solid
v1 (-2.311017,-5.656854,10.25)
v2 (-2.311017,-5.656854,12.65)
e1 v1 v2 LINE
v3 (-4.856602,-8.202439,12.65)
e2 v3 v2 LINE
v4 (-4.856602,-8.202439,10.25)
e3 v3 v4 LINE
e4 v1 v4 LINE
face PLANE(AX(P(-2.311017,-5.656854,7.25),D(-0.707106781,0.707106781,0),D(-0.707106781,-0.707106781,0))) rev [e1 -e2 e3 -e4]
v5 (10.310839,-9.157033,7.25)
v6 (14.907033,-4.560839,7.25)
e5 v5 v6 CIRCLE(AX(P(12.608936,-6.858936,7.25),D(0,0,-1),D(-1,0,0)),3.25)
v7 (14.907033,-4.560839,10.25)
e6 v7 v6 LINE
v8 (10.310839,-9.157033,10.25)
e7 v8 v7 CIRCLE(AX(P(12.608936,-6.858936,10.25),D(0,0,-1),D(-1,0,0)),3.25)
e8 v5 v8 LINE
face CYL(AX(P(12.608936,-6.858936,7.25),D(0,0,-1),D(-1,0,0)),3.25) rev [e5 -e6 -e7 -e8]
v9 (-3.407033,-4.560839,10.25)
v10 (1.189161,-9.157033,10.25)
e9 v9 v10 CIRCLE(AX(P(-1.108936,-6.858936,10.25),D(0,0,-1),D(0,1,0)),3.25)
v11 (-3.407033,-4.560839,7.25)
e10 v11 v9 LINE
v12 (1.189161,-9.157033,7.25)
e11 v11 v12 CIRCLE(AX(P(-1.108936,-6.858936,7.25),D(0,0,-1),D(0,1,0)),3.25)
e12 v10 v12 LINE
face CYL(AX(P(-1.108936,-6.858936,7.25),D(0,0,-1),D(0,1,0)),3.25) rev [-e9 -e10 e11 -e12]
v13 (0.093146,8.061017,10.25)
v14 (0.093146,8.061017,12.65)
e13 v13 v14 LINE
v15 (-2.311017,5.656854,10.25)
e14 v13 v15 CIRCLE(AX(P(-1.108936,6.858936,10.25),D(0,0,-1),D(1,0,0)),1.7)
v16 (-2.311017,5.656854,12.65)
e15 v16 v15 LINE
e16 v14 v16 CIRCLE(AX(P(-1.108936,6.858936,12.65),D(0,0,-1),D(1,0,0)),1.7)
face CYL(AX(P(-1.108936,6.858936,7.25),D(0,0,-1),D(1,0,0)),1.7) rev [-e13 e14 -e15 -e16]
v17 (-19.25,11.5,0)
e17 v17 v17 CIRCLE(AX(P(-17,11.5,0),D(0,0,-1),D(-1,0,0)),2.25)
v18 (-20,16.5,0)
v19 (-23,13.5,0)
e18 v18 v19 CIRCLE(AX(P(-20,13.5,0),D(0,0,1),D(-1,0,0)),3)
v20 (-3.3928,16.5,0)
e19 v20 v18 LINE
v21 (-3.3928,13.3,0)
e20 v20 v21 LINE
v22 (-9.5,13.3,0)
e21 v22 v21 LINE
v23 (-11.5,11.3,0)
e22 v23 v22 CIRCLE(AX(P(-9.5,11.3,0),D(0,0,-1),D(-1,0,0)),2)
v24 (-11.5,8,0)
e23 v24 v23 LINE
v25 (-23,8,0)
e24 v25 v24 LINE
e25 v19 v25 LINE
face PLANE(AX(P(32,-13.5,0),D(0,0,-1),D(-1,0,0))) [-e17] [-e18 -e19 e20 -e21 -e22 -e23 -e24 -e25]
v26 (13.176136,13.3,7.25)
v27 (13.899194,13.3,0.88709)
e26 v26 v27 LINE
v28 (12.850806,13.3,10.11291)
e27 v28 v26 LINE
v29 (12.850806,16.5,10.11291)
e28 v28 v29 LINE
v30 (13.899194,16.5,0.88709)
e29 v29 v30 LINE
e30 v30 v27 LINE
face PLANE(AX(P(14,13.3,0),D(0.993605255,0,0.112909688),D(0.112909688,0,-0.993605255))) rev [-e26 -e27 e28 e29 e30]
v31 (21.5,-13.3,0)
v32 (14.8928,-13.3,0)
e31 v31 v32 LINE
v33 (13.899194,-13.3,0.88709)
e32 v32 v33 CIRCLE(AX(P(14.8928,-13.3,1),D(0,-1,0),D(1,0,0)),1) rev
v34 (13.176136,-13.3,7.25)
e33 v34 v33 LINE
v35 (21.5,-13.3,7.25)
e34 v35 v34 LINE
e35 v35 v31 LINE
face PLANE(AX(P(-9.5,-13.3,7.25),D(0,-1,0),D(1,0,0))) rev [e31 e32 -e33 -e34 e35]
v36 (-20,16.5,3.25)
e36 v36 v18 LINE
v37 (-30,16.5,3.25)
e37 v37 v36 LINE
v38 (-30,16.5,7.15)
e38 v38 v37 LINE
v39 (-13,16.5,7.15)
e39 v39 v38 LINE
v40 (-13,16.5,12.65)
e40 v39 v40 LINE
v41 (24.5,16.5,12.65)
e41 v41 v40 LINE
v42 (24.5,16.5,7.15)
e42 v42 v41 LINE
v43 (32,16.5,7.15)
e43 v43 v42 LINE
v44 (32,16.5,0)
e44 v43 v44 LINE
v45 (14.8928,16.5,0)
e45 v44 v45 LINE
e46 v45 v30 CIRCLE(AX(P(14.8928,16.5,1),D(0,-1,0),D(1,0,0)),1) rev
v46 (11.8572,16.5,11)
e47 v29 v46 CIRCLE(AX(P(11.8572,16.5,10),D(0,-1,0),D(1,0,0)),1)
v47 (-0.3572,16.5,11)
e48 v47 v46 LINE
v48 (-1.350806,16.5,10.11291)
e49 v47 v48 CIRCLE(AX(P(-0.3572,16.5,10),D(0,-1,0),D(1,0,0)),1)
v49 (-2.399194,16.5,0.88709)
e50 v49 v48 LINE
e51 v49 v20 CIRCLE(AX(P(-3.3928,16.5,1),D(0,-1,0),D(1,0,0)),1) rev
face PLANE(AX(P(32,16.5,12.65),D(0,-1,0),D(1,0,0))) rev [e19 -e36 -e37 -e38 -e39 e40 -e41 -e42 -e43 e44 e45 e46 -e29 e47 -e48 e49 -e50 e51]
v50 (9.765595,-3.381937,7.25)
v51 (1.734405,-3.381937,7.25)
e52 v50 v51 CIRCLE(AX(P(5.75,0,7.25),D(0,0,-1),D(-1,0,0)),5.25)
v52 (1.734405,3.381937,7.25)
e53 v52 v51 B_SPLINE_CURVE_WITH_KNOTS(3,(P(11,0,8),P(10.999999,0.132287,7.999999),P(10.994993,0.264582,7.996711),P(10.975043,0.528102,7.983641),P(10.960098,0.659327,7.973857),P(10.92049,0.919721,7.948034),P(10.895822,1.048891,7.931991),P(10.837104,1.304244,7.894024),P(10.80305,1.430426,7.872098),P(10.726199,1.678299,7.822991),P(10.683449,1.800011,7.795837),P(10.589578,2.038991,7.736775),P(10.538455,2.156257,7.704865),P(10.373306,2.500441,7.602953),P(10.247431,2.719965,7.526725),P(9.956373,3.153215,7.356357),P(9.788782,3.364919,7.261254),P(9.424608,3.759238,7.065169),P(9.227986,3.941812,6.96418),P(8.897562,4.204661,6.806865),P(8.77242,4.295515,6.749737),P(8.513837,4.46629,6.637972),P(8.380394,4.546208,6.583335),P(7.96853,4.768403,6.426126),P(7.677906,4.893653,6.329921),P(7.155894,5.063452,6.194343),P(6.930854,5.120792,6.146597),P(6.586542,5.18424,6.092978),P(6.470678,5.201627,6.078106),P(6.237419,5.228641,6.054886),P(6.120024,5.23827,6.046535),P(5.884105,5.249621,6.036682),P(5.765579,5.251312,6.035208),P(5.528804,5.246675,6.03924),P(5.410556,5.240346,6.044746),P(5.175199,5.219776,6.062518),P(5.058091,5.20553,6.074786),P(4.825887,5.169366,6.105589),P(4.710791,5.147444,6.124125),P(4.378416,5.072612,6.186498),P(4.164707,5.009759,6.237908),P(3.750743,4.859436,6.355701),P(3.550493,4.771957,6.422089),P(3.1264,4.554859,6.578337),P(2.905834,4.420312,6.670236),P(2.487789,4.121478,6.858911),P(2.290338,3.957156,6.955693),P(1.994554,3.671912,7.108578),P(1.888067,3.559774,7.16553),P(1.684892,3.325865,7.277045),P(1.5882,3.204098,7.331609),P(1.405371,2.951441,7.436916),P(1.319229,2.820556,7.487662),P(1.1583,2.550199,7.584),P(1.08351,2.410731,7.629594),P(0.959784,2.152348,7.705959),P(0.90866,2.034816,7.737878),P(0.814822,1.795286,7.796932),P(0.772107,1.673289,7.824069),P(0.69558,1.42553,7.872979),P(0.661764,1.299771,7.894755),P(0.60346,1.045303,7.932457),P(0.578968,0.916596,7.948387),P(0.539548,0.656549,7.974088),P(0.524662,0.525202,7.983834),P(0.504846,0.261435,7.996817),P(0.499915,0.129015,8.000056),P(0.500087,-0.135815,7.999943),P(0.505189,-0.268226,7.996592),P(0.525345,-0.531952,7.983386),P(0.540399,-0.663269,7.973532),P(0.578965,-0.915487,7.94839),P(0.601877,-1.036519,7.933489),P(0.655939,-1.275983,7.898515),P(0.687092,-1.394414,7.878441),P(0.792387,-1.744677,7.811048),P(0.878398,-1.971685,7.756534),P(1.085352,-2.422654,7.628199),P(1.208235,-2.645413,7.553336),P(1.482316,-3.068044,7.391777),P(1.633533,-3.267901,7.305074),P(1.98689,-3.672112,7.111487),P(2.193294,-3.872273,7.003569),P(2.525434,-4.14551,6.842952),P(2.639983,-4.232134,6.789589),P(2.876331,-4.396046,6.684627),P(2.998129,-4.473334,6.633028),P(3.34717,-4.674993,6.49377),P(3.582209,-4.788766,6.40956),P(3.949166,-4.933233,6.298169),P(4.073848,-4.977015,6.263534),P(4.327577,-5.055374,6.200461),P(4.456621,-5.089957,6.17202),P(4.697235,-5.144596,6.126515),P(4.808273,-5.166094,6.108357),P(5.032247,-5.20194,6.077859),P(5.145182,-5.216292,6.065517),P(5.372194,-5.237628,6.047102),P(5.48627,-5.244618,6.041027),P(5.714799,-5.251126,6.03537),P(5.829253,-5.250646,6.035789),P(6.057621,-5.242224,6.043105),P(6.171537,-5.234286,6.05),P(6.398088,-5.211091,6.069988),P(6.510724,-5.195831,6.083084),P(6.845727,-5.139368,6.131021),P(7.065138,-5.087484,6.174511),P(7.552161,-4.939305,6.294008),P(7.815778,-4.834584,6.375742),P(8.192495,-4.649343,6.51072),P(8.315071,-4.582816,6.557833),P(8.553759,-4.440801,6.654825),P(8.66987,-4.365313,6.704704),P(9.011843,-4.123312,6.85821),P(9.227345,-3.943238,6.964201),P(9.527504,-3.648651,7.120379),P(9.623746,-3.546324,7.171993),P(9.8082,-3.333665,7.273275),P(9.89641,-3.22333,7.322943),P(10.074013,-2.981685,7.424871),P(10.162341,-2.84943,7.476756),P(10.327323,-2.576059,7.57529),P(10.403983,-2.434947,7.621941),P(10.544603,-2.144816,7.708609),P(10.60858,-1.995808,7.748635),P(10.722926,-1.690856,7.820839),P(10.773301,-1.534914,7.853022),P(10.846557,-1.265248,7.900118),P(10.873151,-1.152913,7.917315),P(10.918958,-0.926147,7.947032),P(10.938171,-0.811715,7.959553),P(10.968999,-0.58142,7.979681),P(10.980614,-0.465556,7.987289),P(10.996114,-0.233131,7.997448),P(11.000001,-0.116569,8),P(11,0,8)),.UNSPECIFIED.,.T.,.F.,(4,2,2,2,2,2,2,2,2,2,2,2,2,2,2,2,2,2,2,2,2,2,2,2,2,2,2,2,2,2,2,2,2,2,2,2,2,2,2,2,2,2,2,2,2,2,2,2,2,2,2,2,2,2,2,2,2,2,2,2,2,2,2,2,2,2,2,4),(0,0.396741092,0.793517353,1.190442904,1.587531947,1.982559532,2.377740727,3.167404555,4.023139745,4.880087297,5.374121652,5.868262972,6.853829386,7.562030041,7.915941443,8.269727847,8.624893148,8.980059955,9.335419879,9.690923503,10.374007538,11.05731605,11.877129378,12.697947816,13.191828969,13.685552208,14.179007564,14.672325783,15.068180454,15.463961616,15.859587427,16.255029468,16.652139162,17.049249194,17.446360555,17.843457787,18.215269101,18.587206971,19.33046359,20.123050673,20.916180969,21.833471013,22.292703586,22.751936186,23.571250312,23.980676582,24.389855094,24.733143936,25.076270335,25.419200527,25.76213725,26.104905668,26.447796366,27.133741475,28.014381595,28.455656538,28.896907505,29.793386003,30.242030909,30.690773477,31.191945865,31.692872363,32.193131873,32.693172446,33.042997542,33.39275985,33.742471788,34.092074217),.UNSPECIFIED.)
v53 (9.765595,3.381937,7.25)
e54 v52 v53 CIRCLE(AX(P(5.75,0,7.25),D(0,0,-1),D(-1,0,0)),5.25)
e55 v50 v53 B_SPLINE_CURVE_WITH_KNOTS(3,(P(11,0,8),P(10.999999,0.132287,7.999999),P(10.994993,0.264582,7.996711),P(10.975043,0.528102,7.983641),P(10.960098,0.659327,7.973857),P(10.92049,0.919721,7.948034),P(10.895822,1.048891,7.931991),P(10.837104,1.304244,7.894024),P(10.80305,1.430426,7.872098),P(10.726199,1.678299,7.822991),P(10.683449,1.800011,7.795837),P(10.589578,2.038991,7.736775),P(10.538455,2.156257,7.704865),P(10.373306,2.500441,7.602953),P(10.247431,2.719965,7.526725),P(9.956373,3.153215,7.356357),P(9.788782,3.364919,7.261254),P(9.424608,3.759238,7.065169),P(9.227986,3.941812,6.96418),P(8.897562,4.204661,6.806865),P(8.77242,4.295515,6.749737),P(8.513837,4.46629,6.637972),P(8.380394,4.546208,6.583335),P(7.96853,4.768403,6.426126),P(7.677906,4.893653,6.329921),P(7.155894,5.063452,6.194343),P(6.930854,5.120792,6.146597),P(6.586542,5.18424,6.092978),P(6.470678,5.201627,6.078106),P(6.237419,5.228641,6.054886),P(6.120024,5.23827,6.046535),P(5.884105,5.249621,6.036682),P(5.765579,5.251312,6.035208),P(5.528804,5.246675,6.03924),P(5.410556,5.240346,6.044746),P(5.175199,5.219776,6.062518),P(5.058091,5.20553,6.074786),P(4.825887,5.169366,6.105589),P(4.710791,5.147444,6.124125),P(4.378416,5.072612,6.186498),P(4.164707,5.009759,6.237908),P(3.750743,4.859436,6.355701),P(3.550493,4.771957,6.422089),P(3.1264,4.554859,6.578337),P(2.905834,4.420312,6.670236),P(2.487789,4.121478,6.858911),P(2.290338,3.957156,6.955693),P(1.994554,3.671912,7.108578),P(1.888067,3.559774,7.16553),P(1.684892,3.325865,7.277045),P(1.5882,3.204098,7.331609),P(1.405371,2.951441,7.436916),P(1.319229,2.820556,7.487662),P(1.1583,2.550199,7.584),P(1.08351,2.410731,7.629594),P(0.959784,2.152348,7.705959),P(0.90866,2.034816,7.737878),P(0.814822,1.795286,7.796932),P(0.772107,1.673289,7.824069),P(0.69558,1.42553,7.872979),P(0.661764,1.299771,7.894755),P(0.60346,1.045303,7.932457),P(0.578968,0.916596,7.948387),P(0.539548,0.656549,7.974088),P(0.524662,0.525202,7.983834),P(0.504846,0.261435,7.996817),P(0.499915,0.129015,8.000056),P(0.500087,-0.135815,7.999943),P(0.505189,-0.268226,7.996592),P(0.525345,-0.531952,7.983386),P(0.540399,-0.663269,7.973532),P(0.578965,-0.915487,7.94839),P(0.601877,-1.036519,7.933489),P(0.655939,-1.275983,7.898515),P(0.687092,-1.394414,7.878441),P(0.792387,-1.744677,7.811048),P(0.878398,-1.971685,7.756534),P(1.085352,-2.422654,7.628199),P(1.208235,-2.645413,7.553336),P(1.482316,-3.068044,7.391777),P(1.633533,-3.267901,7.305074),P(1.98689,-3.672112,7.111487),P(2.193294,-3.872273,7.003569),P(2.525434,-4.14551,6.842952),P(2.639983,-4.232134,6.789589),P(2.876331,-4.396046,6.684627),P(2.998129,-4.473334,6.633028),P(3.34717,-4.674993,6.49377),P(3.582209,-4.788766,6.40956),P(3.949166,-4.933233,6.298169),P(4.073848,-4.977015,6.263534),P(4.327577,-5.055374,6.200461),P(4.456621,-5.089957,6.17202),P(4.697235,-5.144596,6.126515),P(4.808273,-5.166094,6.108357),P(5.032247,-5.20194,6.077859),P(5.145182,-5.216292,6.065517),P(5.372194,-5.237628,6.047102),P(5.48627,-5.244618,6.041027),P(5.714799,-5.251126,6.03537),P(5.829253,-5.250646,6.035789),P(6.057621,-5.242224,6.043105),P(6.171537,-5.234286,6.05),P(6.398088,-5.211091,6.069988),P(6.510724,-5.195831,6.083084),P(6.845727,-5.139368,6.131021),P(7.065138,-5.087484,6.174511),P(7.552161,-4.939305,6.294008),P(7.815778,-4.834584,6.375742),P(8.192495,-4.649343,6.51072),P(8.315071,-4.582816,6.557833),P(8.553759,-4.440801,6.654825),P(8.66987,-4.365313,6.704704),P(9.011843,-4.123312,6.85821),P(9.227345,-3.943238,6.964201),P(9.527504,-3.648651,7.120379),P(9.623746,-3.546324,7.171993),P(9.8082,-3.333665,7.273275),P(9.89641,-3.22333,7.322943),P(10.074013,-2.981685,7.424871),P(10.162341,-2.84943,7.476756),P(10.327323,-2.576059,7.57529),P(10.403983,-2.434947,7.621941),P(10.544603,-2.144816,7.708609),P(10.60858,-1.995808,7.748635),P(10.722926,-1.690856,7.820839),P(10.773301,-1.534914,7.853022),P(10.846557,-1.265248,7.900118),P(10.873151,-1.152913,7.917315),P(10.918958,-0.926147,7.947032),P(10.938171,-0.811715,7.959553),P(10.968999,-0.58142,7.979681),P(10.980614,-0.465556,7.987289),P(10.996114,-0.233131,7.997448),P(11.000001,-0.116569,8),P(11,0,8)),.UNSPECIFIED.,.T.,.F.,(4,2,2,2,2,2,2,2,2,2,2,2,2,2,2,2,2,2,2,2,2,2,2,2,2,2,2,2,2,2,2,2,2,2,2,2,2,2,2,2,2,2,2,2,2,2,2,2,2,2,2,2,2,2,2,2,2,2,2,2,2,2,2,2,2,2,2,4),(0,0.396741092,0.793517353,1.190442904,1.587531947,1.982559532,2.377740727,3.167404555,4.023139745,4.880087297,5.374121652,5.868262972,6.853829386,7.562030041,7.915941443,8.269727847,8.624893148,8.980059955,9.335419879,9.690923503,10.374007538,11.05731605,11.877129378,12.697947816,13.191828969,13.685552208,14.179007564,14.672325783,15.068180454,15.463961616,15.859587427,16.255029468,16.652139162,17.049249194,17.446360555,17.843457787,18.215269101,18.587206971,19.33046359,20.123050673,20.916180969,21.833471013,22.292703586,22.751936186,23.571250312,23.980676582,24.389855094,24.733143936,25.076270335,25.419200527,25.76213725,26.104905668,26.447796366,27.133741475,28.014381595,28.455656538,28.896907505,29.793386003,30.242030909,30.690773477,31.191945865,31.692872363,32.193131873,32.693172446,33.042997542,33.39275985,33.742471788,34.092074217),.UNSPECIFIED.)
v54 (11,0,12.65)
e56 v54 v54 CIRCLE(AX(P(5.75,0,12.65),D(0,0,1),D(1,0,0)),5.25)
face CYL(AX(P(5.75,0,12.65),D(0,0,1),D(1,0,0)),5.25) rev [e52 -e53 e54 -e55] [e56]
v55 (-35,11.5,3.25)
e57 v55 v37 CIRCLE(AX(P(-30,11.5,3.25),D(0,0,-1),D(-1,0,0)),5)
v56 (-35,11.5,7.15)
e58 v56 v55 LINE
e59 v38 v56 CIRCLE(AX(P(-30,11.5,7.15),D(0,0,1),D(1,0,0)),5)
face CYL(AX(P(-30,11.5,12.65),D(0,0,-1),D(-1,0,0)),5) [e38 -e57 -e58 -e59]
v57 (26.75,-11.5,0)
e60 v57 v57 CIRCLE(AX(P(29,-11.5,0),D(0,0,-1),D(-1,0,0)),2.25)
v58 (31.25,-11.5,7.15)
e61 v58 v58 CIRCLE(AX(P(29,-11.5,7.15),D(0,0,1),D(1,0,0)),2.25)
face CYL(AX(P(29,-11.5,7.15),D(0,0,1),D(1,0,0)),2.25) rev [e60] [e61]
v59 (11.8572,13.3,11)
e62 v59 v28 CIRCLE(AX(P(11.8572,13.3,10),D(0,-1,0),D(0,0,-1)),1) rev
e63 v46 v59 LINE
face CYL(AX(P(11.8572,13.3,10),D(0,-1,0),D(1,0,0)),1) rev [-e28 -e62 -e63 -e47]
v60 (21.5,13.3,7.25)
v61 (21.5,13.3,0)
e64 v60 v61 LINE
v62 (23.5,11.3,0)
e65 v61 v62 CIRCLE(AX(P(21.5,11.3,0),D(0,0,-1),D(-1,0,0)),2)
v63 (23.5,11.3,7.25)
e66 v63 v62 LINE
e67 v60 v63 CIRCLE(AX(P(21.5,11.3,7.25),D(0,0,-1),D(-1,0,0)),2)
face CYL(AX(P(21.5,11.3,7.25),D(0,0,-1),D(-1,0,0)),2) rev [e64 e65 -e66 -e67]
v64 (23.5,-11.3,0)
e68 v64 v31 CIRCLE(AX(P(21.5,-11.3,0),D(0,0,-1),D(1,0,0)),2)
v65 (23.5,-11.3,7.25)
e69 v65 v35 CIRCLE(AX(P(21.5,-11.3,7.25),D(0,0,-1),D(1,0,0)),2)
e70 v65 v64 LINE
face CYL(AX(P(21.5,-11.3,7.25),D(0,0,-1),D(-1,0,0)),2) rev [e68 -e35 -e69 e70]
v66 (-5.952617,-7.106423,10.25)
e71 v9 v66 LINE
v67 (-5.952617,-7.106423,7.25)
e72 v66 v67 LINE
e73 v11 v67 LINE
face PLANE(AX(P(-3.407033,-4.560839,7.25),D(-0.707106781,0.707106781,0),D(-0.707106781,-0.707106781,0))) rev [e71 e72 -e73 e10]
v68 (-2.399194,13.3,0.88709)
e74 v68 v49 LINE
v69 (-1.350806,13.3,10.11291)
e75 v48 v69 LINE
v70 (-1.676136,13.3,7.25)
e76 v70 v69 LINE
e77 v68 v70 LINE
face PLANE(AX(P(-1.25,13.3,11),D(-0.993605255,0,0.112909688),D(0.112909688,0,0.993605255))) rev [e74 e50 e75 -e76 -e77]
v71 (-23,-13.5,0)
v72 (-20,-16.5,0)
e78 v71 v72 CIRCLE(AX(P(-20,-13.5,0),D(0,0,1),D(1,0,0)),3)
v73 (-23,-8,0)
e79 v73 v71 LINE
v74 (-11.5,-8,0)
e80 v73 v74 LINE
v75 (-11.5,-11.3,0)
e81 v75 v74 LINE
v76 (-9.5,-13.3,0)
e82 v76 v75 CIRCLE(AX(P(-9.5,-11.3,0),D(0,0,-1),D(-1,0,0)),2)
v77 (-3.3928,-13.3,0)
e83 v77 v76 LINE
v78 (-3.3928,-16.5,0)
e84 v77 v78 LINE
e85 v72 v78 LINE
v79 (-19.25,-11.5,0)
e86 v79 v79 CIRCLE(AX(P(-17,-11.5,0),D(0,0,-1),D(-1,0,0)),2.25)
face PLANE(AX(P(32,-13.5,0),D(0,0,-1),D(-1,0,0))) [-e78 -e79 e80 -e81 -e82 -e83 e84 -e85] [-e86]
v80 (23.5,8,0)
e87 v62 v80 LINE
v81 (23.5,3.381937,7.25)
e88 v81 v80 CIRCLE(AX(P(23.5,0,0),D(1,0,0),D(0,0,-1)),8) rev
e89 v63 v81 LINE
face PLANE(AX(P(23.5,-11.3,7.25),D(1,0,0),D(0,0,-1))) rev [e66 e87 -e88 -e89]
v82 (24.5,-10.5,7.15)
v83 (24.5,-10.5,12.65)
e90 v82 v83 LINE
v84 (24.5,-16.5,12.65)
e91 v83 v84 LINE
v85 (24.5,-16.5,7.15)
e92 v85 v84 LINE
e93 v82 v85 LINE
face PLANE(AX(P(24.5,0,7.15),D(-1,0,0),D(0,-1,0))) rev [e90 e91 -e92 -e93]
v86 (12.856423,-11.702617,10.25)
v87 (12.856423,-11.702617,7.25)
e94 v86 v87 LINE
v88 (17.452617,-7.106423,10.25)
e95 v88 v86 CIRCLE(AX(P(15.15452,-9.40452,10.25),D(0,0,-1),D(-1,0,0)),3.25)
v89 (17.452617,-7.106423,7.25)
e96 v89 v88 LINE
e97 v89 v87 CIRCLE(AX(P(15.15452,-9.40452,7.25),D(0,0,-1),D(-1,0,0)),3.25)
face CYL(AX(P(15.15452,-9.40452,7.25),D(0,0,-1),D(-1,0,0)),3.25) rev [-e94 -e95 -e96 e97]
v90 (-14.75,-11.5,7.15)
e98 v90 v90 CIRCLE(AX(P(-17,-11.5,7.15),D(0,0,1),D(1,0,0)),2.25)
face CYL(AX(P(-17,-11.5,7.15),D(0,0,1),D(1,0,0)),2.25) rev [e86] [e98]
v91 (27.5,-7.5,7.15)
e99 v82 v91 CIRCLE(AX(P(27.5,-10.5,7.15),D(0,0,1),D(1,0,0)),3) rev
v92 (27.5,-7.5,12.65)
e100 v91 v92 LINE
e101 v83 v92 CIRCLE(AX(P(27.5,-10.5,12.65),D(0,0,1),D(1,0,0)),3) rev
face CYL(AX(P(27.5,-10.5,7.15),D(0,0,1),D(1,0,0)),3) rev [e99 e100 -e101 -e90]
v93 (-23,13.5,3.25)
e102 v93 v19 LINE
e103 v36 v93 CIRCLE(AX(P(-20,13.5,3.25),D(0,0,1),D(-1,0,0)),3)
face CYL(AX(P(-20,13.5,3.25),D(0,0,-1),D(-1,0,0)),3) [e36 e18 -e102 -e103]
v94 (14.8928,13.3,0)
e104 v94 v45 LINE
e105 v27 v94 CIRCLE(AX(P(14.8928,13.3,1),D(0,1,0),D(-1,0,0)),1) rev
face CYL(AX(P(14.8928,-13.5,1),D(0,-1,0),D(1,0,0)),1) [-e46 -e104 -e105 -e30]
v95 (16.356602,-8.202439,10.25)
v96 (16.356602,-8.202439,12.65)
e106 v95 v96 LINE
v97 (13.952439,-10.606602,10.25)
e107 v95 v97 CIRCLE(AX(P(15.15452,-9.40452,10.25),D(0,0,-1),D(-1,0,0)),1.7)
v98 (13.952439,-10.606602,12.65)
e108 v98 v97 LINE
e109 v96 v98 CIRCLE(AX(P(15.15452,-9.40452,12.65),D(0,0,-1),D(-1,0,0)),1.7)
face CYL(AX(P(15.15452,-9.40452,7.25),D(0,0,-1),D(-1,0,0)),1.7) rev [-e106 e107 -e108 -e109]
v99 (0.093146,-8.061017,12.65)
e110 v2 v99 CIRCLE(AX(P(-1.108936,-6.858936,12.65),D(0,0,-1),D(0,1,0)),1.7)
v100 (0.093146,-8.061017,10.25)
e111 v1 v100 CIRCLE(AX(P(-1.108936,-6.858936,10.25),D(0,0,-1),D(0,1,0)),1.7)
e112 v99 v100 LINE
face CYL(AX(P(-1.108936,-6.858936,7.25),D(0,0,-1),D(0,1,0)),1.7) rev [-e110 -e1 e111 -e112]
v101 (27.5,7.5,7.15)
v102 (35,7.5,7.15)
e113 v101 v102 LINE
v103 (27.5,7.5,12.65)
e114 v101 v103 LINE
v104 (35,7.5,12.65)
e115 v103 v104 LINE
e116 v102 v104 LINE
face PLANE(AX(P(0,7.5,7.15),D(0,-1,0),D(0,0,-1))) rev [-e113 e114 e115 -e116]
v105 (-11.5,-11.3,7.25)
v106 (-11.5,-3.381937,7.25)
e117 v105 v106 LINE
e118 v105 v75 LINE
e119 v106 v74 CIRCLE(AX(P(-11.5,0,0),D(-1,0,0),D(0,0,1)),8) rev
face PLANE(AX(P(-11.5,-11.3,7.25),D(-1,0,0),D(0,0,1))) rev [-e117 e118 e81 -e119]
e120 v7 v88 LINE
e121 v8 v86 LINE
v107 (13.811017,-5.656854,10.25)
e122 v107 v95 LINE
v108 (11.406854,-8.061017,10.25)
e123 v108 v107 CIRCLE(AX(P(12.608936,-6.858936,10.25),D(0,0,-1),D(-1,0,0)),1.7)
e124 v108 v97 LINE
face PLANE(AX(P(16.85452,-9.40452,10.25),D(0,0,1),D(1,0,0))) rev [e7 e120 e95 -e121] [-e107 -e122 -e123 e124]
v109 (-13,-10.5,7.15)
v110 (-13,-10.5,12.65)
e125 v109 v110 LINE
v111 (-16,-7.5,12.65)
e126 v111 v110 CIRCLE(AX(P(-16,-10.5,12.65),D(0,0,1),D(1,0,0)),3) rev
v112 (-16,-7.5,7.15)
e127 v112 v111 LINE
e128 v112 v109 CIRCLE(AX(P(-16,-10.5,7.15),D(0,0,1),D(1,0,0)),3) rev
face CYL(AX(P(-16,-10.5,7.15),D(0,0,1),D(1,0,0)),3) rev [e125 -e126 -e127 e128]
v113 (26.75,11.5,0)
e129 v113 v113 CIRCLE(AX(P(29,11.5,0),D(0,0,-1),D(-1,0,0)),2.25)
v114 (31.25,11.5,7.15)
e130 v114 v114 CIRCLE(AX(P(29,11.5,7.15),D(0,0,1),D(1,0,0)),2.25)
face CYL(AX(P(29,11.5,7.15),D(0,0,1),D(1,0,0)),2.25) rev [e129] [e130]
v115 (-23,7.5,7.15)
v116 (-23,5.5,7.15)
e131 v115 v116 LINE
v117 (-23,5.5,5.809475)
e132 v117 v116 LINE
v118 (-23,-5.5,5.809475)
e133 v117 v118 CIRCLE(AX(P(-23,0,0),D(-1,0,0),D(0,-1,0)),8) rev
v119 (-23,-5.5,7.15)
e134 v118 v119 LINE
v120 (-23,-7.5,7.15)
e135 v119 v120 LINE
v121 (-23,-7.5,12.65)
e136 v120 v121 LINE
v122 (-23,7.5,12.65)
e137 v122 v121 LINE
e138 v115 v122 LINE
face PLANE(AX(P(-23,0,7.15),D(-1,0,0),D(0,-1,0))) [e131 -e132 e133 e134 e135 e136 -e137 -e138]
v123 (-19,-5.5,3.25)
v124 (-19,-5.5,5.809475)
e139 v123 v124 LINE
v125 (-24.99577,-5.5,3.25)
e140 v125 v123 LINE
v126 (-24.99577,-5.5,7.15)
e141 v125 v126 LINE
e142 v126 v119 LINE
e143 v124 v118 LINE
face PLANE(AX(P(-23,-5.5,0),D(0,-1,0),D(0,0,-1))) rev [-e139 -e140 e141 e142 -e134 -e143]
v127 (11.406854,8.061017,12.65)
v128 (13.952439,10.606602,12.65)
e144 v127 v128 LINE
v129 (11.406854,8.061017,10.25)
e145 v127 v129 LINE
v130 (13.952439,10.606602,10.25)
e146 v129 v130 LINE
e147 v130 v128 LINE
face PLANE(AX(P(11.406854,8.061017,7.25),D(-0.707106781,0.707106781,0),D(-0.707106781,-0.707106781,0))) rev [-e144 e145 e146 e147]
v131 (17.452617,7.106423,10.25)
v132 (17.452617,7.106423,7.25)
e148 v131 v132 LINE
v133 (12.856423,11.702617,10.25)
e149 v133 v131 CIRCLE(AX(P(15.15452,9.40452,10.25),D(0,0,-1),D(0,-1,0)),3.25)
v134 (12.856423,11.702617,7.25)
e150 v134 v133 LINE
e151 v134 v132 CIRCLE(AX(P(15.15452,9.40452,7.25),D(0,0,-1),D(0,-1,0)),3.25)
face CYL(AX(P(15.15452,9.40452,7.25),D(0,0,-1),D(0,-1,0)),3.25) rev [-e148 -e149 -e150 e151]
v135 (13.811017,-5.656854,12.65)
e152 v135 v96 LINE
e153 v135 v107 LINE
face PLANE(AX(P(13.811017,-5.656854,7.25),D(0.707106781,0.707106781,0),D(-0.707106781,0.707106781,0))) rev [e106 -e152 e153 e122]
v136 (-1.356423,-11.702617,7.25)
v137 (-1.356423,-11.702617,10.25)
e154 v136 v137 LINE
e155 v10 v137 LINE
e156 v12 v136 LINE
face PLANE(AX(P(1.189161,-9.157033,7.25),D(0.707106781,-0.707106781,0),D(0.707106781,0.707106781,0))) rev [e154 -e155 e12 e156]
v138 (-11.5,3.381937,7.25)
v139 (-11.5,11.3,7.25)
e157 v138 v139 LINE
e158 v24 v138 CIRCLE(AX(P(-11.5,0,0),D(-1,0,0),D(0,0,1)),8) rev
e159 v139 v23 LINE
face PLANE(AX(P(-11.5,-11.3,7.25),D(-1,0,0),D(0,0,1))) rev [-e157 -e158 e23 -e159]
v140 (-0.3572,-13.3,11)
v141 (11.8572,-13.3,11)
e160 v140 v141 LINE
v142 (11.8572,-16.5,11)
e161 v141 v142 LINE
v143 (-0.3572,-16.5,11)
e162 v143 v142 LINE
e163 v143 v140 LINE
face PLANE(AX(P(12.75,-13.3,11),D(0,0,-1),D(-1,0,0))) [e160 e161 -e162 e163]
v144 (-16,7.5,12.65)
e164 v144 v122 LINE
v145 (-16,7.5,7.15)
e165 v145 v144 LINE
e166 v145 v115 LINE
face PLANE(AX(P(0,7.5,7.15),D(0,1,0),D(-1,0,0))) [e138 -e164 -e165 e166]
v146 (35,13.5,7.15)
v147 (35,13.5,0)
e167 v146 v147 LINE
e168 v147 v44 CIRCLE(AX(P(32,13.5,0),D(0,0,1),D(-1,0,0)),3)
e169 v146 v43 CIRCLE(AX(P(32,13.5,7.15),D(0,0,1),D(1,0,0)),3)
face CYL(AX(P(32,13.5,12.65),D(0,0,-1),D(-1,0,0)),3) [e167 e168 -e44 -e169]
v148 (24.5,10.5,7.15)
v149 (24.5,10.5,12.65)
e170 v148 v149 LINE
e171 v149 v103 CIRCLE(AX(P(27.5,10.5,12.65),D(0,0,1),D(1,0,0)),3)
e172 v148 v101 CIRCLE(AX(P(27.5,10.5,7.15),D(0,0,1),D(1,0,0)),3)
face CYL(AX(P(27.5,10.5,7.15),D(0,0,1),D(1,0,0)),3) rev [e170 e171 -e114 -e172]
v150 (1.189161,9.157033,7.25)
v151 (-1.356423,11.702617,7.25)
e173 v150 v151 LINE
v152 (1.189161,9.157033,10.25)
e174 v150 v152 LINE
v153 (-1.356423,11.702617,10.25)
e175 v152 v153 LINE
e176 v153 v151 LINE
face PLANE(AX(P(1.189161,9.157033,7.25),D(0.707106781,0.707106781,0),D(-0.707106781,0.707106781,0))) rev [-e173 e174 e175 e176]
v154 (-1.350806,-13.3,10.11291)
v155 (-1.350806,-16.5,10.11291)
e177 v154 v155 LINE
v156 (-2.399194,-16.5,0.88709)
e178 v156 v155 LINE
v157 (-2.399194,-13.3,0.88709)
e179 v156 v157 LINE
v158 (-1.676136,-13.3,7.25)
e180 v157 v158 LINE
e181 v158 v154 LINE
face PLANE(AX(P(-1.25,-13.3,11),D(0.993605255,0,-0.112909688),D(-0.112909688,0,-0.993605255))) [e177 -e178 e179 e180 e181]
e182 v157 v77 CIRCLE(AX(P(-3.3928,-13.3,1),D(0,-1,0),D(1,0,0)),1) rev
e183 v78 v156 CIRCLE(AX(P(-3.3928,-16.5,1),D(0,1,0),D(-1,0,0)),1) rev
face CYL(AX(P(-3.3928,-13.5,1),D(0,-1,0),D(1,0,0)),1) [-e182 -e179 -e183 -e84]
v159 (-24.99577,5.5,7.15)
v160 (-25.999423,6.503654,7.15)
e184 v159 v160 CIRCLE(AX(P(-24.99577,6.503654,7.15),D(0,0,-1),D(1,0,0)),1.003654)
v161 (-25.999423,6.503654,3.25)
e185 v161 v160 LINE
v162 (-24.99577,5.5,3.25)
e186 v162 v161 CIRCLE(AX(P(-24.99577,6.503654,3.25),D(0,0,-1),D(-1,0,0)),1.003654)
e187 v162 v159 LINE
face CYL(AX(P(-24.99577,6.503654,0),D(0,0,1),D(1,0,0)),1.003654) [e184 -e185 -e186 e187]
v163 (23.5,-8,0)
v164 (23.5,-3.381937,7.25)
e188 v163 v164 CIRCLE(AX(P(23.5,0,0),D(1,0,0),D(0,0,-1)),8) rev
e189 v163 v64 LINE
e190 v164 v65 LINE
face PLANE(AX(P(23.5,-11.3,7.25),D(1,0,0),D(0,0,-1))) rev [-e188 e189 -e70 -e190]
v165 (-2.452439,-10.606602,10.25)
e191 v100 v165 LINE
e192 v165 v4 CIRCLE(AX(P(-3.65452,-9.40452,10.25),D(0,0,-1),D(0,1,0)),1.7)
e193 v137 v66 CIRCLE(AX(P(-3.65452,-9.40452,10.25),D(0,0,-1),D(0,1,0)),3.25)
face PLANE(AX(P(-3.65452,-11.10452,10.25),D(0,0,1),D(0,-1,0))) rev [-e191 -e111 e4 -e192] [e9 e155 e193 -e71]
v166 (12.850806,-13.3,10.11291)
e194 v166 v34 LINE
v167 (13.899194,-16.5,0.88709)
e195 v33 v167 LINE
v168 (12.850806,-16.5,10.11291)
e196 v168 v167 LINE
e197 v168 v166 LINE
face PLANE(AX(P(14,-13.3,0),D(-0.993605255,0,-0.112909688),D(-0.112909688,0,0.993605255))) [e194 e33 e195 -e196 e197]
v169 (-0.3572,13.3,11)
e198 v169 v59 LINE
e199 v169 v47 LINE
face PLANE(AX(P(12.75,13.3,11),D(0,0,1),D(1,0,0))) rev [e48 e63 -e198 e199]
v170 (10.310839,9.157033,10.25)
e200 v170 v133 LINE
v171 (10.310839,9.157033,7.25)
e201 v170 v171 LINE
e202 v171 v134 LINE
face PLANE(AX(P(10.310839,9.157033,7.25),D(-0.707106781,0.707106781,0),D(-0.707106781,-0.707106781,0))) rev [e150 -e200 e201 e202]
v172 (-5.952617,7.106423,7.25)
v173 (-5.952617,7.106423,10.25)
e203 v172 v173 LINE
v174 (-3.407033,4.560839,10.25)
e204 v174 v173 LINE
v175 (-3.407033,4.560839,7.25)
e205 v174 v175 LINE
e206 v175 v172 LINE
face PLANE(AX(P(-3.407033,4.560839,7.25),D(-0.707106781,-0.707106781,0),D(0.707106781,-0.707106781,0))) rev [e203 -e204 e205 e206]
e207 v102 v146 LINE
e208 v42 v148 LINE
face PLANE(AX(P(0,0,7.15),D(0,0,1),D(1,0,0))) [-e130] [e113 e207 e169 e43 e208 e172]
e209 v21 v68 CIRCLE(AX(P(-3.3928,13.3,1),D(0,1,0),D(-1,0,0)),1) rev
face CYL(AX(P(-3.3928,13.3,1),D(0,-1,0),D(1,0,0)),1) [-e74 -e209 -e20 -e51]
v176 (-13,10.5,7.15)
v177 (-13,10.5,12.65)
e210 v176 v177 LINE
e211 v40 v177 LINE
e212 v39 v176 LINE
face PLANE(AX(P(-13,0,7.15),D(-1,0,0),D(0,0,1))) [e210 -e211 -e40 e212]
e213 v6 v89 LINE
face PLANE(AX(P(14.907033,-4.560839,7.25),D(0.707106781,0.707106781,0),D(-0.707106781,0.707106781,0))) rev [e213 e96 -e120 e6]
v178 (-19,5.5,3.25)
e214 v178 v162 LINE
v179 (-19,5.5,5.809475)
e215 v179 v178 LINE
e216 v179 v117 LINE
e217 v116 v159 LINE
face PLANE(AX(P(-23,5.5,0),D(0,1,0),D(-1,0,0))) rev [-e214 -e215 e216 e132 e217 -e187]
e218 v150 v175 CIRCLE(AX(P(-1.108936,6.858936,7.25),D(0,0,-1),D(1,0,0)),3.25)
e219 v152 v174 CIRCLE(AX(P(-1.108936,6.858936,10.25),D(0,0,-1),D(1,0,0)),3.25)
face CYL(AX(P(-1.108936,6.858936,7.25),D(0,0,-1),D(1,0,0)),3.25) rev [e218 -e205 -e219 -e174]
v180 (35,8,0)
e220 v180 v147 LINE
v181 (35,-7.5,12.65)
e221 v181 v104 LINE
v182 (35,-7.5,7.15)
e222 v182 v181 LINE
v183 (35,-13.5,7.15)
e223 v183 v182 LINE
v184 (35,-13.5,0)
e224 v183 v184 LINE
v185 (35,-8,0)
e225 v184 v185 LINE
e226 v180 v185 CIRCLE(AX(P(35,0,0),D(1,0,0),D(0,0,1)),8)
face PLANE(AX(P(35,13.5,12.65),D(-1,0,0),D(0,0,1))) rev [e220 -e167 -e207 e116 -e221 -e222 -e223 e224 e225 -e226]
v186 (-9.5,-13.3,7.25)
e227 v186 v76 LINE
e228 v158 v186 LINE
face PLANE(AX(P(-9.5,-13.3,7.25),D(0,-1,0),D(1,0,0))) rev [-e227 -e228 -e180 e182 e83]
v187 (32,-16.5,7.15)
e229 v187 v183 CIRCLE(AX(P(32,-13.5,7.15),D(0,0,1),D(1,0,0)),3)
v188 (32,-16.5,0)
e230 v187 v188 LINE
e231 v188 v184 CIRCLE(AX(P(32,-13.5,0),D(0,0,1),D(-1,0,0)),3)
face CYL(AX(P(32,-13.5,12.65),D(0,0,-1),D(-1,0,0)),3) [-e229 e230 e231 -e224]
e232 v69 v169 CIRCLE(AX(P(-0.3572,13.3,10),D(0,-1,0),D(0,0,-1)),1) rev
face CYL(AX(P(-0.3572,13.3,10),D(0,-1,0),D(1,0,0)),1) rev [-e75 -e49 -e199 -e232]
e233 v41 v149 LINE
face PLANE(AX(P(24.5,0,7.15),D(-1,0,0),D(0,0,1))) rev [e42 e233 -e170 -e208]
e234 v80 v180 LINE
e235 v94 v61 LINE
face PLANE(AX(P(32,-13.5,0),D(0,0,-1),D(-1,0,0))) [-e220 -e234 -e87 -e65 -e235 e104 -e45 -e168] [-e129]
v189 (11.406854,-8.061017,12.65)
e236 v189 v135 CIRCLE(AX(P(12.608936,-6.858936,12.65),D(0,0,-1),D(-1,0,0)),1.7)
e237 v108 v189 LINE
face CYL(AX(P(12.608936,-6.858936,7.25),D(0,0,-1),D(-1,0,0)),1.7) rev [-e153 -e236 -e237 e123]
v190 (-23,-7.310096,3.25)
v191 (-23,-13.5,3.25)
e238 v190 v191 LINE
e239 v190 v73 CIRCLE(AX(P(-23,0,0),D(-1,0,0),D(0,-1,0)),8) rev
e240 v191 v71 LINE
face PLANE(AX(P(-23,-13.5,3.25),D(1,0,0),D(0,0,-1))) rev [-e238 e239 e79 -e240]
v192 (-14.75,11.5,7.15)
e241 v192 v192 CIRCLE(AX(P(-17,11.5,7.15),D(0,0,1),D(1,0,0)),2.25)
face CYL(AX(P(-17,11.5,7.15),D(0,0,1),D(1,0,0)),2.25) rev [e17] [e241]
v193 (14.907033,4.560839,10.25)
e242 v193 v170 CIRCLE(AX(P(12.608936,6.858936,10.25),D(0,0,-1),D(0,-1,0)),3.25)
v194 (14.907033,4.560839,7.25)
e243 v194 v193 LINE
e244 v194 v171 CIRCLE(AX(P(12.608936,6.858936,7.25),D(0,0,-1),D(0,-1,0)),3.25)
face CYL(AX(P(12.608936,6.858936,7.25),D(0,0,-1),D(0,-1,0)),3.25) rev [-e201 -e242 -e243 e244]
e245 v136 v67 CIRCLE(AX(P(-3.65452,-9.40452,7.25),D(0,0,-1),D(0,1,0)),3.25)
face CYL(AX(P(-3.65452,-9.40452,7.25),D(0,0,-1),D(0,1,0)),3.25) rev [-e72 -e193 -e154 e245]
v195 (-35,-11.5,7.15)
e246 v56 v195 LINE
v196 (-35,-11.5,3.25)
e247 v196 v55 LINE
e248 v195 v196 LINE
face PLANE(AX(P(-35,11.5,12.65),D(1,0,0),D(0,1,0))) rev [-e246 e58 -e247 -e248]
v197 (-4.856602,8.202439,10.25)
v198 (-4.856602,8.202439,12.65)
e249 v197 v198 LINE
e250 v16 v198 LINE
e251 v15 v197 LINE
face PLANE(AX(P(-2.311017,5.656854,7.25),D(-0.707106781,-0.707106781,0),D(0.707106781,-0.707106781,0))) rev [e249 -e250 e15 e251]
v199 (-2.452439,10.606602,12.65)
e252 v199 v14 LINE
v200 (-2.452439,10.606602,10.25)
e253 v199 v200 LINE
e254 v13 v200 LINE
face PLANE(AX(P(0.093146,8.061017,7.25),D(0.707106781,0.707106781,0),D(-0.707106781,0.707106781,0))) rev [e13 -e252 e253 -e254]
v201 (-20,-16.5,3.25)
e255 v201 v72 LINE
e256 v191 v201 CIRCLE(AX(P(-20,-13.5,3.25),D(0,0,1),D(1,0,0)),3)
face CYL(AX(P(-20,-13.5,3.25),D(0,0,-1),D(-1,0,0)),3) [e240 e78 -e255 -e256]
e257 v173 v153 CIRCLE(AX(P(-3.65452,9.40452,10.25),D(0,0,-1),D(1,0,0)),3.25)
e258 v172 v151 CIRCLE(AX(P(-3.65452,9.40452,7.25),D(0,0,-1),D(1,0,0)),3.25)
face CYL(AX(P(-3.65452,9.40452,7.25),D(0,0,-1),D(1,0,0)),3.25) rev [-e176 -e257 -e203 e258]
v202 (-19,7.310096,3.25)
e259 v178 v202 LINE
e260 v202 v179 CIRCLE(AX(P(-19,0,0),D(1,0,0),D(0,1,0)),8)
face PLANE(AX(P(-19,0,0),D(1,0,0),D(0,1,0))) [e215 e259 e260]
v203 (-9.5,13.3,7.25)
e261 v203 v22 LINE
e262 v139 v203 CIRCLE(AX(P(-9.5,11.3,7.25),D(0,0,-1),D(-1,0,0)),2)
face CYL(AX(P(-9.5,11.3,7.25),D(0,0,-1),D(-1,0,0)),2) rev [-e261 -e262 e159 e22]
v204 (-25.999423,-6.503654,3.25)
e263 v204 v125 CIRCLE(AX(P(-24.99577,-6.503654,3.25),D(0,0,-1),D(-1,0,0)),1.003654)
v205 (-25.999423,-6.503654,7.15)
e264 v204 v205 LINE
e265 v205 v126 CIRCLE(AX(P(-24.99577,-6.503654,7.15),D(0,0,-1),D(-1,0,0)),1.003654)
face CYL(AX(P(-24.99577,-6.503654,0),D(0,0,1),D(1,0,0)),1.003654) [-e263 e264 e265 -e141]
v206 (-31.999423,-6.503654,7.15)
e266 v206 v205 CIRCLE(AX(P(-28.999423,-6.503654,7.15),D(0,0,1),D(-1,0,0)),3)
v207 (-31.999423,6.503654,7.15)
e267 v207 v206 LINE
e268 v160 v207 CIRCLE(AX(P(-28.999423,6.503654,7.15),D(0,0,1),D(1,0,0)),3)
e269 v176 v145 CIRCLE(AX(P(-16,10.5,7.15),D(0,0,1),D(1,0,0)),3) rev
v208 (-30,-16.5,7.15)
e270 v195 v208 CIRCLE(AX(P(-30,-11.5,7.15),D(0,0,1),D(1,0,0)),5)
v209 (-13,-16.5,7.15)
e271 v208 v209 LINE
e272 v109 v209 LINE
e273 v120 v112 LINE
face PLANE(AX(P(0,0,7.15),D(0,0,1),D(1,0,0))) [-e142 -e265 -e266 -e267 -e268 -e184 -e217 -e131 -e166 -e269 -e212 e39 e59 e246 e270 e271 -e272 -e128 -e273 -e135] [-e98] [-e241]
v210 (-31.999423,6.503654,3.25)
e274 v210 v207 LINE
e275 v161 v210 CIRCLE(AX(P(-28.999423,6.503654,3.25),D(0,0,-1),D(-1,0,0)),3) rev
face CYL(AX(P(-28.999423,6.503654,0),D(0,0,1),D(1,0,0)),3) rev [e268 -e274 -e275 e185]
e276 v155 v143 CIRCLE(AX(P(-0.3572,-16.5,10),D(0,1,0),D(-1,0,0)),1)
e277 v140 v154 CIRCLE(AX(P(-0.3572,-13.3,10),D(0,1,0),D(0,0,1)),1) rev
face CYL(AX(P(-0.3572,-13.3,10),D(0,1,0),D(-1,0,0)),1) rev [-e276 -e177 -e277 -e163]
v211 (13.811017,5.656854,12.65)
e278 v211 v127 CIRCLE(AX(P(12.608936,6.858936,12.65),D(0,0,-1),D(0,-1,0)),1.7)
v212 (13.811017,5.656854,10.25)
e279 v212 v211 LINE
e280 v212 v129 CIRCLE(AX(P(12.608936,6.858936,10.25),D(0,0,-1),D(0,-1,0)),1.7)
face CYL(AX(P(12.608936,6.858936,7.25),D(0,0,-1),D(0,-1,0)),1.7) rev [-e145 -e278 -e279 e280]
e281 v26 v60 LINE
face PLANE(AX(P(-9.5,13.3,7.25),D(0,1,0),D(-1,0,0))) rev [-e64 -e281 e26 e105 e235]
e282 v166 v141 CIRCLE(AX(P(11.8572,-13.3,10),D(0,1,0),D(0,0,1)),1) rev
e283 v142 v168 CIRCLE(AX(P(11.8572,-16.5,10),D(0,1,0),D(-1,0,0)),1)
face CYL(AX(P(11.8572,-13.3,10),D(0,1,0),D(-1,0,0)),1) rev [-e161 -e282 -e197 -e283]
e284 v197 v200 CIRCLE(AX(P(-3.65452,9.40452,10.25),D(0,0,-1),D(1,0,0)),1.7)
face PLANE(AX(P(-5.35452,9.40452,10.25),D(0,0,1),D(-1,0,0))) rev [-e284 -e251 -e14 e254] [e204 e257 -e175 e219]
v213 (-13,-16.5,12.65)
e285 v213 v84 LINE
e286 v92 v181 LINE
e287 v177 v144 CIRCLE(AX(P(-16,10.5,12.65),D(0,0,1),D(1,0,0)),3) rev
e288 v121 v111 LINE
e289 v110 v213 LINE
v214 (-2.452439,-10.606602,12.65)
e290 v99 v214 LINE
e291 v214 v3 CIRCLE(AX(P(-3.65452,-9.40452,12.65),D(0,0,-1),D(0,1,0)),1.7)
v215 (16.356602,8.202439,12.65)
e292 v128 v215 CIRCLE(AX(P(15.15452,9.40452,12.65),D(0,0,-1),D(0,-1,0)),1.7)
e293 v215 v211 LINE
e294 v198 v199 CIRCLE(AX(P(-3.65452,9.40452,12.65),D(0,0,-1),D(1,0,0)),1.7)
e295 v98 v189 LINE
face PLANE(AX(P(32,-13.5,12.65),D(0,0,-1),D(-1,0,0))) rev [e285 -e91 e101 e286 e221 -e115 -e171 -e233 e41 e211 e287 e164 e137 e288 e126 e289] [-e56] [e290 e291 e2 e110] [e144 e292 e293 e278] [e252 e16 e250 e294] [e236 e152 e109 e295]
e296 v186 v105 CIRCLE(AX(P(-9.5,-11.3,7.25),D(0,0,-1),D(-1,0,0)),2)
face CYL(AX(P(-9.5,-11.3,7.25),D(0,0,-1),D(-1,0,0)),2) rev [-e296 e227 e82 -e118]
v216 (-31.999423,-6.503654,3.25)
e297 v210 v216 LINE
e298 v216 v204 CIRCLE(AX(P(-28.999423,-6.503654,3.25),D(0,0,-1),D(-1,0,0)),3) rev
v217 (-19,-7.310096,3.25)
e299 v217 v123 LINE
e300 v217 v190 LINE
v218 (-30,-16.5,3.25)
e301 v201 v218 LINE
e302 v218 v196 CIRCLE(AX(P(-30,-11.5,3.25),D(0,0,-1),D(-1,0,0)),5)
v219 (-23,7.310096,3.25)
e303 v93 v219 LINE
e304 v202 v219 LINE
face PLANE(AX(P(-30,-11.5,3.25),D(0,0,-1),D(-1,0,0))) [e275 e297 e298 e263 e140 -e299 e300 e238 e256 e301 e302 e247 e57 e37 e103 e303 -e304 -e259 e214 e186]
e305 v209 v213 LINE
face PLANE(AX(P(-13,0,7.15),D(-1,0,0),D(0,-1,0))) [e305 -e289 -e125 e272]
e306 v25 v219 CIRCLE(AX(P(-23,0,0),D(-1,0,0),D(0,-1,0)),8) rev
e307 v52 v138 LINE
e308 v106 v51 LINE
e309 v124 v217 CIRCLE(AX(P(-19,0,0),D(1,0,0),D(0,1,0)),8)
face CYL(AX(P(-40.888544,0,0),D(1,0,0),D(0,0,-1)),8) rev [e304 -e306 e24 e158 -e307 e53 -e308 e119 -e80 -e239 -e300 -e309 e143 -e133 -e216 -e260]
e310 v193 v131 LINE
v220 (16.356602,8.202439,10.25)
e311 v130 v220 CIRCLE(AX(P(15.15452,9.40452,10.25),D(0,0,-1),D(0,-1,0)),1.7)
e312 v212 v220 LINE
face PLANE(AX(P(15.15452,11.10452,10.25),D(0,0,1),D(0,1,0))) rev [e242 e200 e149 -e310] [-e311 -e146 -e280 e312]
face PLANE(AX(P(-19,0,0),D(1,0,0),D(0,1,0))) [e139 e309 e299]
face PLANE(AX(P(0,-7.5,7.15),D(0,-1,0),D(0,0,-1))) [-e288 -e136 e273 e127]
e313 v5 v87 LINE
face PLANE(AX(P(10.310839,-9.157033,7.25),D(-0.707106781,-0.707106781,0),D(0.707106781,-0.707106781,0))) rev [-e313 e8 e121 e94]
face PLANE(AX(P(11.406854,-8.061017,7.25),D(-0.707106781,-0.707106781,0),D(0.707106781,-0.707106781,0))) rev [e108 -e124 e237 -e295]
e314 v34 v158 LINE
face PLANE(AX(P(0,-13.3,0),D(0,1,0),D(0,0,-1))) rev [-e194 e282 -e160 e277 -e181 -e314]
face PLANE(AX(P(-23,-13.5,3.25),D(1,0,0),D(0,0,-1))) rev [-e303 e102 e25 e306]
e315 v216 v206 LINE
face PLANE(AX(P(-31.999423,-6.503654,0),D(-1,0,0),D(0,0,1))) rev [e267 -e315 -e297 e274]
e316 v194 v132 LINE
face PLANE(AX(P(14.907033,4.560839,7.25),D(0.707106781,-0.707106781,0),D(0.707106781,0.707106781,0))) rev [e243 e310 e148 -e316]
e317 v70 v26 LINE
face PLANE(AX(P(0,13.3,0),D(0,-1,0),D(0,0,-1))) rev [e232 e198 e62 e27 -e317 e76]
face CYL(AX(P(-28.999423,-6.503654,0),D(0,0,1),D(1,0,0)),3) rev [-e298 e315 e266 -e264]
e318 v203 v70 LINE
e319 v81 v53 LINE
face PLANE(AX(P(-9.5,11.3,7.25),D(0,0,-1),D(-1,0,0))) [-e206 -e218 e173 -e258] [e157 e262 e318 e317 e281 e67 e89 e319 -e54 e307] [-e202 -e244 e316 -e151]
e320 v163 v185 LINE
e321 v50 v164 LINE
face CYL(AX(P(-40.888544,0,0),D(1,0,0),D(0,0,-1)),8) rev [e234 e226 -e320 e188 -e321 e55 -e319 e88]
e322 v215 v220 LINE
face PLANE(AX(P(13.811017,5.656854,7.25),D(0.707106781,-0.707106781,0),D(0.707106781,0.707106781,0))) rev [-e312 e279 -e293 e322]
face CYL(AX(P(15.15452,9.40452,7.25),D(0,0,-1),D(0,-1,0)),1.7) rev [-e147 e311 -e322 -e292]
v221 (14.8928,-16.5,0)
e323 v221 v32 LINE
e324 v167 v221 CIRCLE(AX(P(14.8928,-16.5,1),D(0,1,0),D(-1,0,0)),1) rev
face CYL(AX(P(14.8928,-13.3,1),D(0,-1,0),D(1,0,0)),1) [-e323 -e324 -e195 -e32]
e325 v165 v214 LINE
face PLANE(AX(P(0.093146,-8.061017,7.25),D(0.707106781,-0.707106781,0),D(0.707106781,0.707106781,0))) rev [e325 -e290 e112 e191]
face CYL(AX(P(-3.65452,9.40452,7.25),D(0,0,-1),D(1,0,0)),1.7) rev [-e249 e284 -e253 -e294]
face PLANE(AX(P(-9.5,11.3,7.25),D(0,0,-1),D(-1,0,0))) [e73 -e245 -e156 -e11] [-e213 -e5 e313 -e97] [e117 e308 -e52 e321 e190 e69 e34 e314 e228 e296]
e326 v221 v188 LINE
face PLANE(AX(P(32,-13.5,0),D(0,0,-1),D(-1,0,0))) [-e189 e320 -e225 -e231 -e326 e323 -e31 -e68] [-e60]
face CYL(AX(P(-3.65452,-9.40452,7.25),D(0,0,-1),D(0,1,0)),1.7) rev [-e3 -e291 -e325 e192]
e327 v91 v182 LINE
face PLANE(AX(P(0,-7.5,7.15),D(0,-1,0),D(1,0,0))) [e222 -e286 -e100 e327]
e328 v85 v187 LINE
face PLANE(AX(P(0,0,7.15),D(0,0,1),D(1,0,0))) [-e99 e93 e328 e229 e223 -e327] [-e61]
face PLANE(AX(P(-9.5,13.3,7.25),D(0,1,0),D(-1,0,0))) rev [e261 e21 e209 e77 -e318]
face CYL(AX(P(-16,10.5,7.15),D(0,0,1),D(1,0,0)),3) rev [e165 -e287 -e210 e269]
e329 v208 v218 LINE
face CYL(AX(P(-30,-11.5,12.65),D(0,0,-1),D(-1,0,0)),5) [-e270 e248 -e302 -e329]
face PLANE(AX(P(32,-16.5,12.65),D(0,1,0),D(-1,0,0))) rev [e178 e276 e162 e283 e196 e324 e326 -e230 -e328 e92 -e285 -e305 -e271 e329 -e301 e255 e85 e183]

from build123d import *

# Parameters (mm, degrees)
BOSS_EXTRUDE1_DEPTH             = 12.65
CUT_EXTRUDE1_START              = -5.5
CUT_EXTRUDE1_DEPTH              = 5.5
CUT_EXTRUDE3_DEPTH              = 40.349364671
CUT_EXTRUDE4_DEPTH              = 58
CUT_EXTRUDE5_DEPTH              = 3.25
CUT_EXTRUDE6_DEPTH              = 7.25
M10_CLEARANCE_HOLE1_D           = 10.5
CBORE_START                     = 7.25
CBORE_SLOT_FOR_M3_SHCS1_DEPTH   = 3
CBORE_START_2                   = 10.25
CBORE_SLOT_FOR_M3_SHCS1_2_DEPTH = 2.4
CIRPATTERN1_COUNT               = 4
M4_CLEARANCE_HOLE1_D            = 4.5
BOSS_EXTRUDE2_START             = 4
BOSS_EXTRUDE2_DEPTH             = 4
CUT_EXTRUDE7_DEPTH              = 3.2
FILLET1_R                       = 1
FILLET1_OF_MIRROR1_R            = 1


# Read off the part's stored shape, not the designer's step: CBORE SLOT for M3 SHCS1
with BuildPart() as part:
    # Sketch2 → Boss-Extrude1 (new body)
    with BuildSketch(Plane.XY):
        with BuildLine():
            Line((32, 16.5), (-30, 16.5))
            ThreePointArc((-30, 16.5), (-33.535533906, 15.035533906), (-35, 11.5))
            Line((-35, 11.5), (-35, -11.5))
            ThreePointArc((-35, -11.5), (-33.535533906, -15.035533906), (-30, -16.5))
            Line((-30, -16.5), (32, -16.5))
            ThreePointArc((32, -16.5), (34.121320344, -15.621320344), (35, -13.5))
            Line((35, -13.5), (35, 13.5))
            ThreePointArc((35, 13.5), (34.121320344, 15.621320344), (32, 16.5))
        make_face()
    extrude(amount=BOSS_EXTRUDE1_DEPTH)

    # Sketch3 → Cut-Extrude1 (cut)
    with BuildSketch(Plane.XY.offset(12.65).offset(CUT_EXTRUDE1_START)):
        with BuildLine():
            Line((-13, 10.5), (-13, 16.5))
            Line((-13, 16.5), (-30, 16.5))
            ThreePointArc((-30, 16.5), (-33.535533906, 15.035533906), (-35, 11.5))
            Line((-35, 11.5), (-35, -11.5))
            ThreePointArc((-35, -11.5), (-33.535533906, -15.035533906), (-30, -16.5))
            Line((-30, -16.5), (-13, -16.5))
            Line((-13, -16.5), (-13, -10.5))
            ThreePointArc((-13, -10.5), (-13.878679656, -8.378679656), (-16, -7.5))
            Line((-16, -7.5), (-23, -7.5))
            Line((-23, -7.5), (-23, 7.5))
            Line((-23, 7.5), (-16, 7.5))
            ThreePointArc((-16, 7.5), (-13.878679656, 8.378679656), (-13, 10.5))
        make_face()
        with BuildLine():
            Line((32, 16.5), (24.5, 16.5))
            Line((24.5, 16.5), (24.5, 10.5))
            ThreePointArc((24.5, 10.5), (25.378679656, 8.378679656), (27.5, 7.5))
            Line((27.5, 7.5), (35, 7.5))
            Line((35, 7.5), (35, 13.5))
            ThreePointArc((35, 13.5), (34.121320344, 15.621320344), (32, 16.5))
        make_face()
        with BuildLine():
            Line((35, -13.5), (35, -7.5))
            Line((35, -7.5), (27.5, -7.5))
            ThreePointArc((27.5, -7.5), (25.378679656, -8.378679656), (24.5, -10.5))
            Line((24.5, -10.5), (24.5, -16.5))
            Line((24.5, -16.5), (32, -16.5))
            ThreePointArc((32, -16.5), (34.121320344, -15.621320344), (35, -13.5))
        make_face()
    extrude(amount=CUT_EXTRUDE1_DEPTH, mode=Mode.SUBTRACT)

    # Sketch5 → Cut-Extrude3 (cut, through all)
    with BuildSketch(Plane.XY.offset(7.15)):
        with BuildLine():
            Line((-23, -5.5), (-24.995769837, -5.5))
            ThreePointArc((-24.995769837, -5.5), (-25.705460123, -5.793963342), (-25.999423465, -6.503653628))
            ThreePointArc((-25.999423465, -6.503653628), (-28.999423465, -9.503653628), (-31.999423465, -6.503653628))
            Line((-31.999423465, -6.503653628), (-31.999423465, 6.503653628))
            ThreePointArc((-31.999423465, 6.503653628), (-28.999423465, 9.503653628), (-25.999423465, 6.503653628))
            ThreePointArc((-25.999423465, 6.503653628), (-25.705460123, 5.793963342), (-24.995769837, 5.5))
            Line((-24.995769837, 5.5), (-23, 5.5))
            Line((-23, 5.5), (-23, -5.5))
        make_face()
    extrude(amount=-CUT_EXTRUDE3_DEPTH, mode=Mode.SUBTRACT)

    # Sketch4 → Cut-Extrude4 (cut)
    with BuildSketch(Plane(origin=(35, 0, 0), x_dir=(0, 0, -1), z_dir=(1, 0, 0))):
        with BuildLine():
            Line((0, -8), (0, 8))
            ThreePointArc((0, 8), (-8, 0), (0, -8))
        make_face()
    extrude(amount=-CUT_EXTRUDE4_DEPTH, mode=Mode.SUBTRACT)

    # Sketch6 → Cut-Extrude5 (cut)
    with BuildSketch(Plane(origin=(0, 0, 0), x_dir=(-1, 0, 0), z_dir=(0, 0, -1))):
        with BuildLine():
            Line((30, -16.5), (20, -16.5))
            ThreePointArc((20, -16.5), (22.121320344, -15.621320344), (23, -13.5))
            Line((23, -13.5), (23, 13.5))
            ThreePointArc((23, 13.5), (22.121320344, 15.621320344), (20, 16.5))
            Line((20, 16.5), (30, 16.5))
            ThreePointArc((30, 16.5), (33.535533906, 15.035533906), (35, 11.5))
            Line((35, 11.5), (35, -11.5))
            ThreePointArc((35, -11.5), (33.535533906, -15.035533906), (30, -16.5))
        make_face()
    extrude(amount=-CUT_EXTRUDE5_DEPTH, mode=Mode.SUBTRACT)

    # Sketch7 → Cut-Extrude6 (cut)
    with BuildSketch(Plane(origin=(0, 0, 0), x_dir=(-1, 0, 0), z_dir=(0, 0, -1))):
        with BuildLine():
            Line((9.5, -13.3), (-21.5, -13.3))
            ThreePointArc((-21.5, -13.3), (-22.914213562, -12.714213562), (-23.5, -11.3))
            Line((-23.5, -11.3), (-23.5, 11.3))
            ThreePointArc((-23.5, 11.3), (-22.914213562, 12.714213562), (-21.5, 13.3))
            Line((-21.5, 13.3), (9.5, 13.3))
            ThreePointArc((9.5, 13.3), (10.914213562, 12.714213562), (11.5, 11.3))
            Line((11.5, 11.3), (11.5, -11.3))
            ThreePointArc((11.5, -11.3), (10.914213562, -12.714213562), (9.5, -13.3))
        make_face()
    extrude(amount=-CUT_EXTRUDE6_DEPTH, mode=Mode.SUBTRACT)

    # M10 Clearance Hole1 (through all)
    with Locations(Plane.XY.offset(12.65)):
        with Locations((5.75, 0)):
            Hole(M10_CLEARANCE_HOLE1_D / 2)

    # CBORE SLOT for M3 SHCS1 outline → CBORE SLOT for M3 SHCS1 (cut)
    with BuildSketch(Plane.XY.offset(CBORE_START)):
        with BuildLine():
            ThreePointArc((12.856423151, -11.702617229), (17.452617229, -11.702617229), (17.452617229, -7.106423151))
            Line((17.452617229, -7.106423151), (14.907032816, -4.560838739))
            ThreePointArc((14.907032816, -4.560838739), (10.310838739, -4.560838739), (10.310838739, -9.157032816))
            Line((10.310838739, -9.157032816), (12.856423151, -11.702617229))
        make_face()
    cbore_slot_for_m3_shcs1 = extrude(amount=CBORE_SLOT_FOR_M3_SHCS1_DEPTH, mode=Mode.SUBTRACT)

    # CBORE SLOT for M3 SHCS1 2 outline → CBORE SLOT for M3 SHCS1 2 (cut)
    with BuildSketch(Plane.XY.offset(CBORE_START_2)):
        with BuildLine():
            ThreePointArc((13.952438662, -10.606601718), (16.356601718, -10.606601718), (16.356601718, -8.202438662))
            Line((16.356601718, -8.202438662), (13.811017306, -5.656854249))
            ThreePointArc((13.811017306, -5.656854249), (11.406854249, -5.656854249), (11.406854249, -8.061017306))
            Line((11.406854249, -8.061017306), (13.952438662, -10.606601718))
        make_face()
    cbore_slot_for_m3_shcs1_2 = extrude(amount=CBORE_SLOT_FOR_M3_SHCS1_2_DEPTH, mode=Mode.SUBTRACT)

    # CirPattern1: CBORE SLOT for M3 SHCS1, CBORE SLOT for M3 SHCS1 2 ×4 about axis
    cirpattern1_axis = Axis((5.75, 0, 0), (0, 0, 1))
    add([cbore_slot_for_m3_shcs1.rotate(cirpattern1_axis, i * 360 / CIRPATTERN1_COUNT) for i in range(1, CIRPATTERN1_COUNT)], mode=Mode.SUBTRACT)
    add([cbore_slot_for_m3_shcs1_2.rotate(cirpattern1_axis, i * 360 / CIRPATTERN1_COUNT) for i in range(1, CIRPATTERN1_COUNT)], mode=Mode.SUBTRACT)

    # M4 Clearance Hole1 (through all)
    with Locations(Plane.XY.offset(7.15)):
        with Locations((29, -11.5), (29, 11.5), (-17, 11.5), (-17, -11.5)):
            Hole(M4_CLEARANCE_HOLE1_D / 2)

    # Sketch19 → Boss-Extrude2 (add)
    with BuildSketch(Plane(origin=(-23, 0, 0), x_dir=(0, 0, -1), z_dir=(1, 0, 0)).offset(BOSS_EXTRUDE2_START)):
        with BuildLine():
            Line((-3.25, 5.5), (-3.25, 7.310095759))
            ThreePointArc((-3.25, 7.310095759), (-4.619267644, 6.531643471), (-5.809475019, 5.5))
            Line((-5.809475019, 5.5), (-3.25, 5.5))
        make_face()
        with BuildLine():
            Line((-3.25, -7.310095759), (-3.25, -5.5))
            Line((-3.25, -5.5), (-5.809475019, -5.5))
            ThreePointArc((-5.809475019, -5.5), (-4.619267644, -6.531643471), (-3.25, -7.310095759))
        make_face()
    extrude(amount=-BOSS_EXTRUDE2_DEPTH)

    # Sketch20 → Cut-Extrude7 (cut)
    with BuildSketch(Plane(origin=(0, 16.5, 0), x_dir=(1, 0, 0), z_dir=(0, 1, 0))):
        Polygon((-2.5, 0), (14, 0), (12.75, -11), (-1.25, -11), align=None)
    cut_extrude7 = extrude(amount=-CUT_EXTRUDE7_DEPTH, mode=Mode.SUBTRACT)

    # Fillet1
    fillet1_edges = [part.edges().sort_by_distance(p)[0] for p in [
        (-1.25, 14.9, 11),
        (-2.5, 14.9, 0),
        (14, 14.9, 0),
        (12.75, 14.9, 11),
    ]]
    fillet(fillet1_edges, radius=FILLET1_R)

    # Mirror1: Cut-Extrude7 across plane
    add(cut_extrude7.mirror(Plane.ZX), mode=Mode.SUBTRACT)

    # Fillet1 of Mirror1
    fillet1_of_mirror1_edges = [part.edges().sort_by_distance(p)[0] for p in [
        (-1.25, -14.9, 11),
        (-2.5, -14.9, 0),
        (14, -14.9, 0),
        (12.75, -14.9, 11),
    ]]
    fillet(fillet1_of_mirror1_edges, radius=FILLET1_OF_MIRROR1_R)


solid = part.part
